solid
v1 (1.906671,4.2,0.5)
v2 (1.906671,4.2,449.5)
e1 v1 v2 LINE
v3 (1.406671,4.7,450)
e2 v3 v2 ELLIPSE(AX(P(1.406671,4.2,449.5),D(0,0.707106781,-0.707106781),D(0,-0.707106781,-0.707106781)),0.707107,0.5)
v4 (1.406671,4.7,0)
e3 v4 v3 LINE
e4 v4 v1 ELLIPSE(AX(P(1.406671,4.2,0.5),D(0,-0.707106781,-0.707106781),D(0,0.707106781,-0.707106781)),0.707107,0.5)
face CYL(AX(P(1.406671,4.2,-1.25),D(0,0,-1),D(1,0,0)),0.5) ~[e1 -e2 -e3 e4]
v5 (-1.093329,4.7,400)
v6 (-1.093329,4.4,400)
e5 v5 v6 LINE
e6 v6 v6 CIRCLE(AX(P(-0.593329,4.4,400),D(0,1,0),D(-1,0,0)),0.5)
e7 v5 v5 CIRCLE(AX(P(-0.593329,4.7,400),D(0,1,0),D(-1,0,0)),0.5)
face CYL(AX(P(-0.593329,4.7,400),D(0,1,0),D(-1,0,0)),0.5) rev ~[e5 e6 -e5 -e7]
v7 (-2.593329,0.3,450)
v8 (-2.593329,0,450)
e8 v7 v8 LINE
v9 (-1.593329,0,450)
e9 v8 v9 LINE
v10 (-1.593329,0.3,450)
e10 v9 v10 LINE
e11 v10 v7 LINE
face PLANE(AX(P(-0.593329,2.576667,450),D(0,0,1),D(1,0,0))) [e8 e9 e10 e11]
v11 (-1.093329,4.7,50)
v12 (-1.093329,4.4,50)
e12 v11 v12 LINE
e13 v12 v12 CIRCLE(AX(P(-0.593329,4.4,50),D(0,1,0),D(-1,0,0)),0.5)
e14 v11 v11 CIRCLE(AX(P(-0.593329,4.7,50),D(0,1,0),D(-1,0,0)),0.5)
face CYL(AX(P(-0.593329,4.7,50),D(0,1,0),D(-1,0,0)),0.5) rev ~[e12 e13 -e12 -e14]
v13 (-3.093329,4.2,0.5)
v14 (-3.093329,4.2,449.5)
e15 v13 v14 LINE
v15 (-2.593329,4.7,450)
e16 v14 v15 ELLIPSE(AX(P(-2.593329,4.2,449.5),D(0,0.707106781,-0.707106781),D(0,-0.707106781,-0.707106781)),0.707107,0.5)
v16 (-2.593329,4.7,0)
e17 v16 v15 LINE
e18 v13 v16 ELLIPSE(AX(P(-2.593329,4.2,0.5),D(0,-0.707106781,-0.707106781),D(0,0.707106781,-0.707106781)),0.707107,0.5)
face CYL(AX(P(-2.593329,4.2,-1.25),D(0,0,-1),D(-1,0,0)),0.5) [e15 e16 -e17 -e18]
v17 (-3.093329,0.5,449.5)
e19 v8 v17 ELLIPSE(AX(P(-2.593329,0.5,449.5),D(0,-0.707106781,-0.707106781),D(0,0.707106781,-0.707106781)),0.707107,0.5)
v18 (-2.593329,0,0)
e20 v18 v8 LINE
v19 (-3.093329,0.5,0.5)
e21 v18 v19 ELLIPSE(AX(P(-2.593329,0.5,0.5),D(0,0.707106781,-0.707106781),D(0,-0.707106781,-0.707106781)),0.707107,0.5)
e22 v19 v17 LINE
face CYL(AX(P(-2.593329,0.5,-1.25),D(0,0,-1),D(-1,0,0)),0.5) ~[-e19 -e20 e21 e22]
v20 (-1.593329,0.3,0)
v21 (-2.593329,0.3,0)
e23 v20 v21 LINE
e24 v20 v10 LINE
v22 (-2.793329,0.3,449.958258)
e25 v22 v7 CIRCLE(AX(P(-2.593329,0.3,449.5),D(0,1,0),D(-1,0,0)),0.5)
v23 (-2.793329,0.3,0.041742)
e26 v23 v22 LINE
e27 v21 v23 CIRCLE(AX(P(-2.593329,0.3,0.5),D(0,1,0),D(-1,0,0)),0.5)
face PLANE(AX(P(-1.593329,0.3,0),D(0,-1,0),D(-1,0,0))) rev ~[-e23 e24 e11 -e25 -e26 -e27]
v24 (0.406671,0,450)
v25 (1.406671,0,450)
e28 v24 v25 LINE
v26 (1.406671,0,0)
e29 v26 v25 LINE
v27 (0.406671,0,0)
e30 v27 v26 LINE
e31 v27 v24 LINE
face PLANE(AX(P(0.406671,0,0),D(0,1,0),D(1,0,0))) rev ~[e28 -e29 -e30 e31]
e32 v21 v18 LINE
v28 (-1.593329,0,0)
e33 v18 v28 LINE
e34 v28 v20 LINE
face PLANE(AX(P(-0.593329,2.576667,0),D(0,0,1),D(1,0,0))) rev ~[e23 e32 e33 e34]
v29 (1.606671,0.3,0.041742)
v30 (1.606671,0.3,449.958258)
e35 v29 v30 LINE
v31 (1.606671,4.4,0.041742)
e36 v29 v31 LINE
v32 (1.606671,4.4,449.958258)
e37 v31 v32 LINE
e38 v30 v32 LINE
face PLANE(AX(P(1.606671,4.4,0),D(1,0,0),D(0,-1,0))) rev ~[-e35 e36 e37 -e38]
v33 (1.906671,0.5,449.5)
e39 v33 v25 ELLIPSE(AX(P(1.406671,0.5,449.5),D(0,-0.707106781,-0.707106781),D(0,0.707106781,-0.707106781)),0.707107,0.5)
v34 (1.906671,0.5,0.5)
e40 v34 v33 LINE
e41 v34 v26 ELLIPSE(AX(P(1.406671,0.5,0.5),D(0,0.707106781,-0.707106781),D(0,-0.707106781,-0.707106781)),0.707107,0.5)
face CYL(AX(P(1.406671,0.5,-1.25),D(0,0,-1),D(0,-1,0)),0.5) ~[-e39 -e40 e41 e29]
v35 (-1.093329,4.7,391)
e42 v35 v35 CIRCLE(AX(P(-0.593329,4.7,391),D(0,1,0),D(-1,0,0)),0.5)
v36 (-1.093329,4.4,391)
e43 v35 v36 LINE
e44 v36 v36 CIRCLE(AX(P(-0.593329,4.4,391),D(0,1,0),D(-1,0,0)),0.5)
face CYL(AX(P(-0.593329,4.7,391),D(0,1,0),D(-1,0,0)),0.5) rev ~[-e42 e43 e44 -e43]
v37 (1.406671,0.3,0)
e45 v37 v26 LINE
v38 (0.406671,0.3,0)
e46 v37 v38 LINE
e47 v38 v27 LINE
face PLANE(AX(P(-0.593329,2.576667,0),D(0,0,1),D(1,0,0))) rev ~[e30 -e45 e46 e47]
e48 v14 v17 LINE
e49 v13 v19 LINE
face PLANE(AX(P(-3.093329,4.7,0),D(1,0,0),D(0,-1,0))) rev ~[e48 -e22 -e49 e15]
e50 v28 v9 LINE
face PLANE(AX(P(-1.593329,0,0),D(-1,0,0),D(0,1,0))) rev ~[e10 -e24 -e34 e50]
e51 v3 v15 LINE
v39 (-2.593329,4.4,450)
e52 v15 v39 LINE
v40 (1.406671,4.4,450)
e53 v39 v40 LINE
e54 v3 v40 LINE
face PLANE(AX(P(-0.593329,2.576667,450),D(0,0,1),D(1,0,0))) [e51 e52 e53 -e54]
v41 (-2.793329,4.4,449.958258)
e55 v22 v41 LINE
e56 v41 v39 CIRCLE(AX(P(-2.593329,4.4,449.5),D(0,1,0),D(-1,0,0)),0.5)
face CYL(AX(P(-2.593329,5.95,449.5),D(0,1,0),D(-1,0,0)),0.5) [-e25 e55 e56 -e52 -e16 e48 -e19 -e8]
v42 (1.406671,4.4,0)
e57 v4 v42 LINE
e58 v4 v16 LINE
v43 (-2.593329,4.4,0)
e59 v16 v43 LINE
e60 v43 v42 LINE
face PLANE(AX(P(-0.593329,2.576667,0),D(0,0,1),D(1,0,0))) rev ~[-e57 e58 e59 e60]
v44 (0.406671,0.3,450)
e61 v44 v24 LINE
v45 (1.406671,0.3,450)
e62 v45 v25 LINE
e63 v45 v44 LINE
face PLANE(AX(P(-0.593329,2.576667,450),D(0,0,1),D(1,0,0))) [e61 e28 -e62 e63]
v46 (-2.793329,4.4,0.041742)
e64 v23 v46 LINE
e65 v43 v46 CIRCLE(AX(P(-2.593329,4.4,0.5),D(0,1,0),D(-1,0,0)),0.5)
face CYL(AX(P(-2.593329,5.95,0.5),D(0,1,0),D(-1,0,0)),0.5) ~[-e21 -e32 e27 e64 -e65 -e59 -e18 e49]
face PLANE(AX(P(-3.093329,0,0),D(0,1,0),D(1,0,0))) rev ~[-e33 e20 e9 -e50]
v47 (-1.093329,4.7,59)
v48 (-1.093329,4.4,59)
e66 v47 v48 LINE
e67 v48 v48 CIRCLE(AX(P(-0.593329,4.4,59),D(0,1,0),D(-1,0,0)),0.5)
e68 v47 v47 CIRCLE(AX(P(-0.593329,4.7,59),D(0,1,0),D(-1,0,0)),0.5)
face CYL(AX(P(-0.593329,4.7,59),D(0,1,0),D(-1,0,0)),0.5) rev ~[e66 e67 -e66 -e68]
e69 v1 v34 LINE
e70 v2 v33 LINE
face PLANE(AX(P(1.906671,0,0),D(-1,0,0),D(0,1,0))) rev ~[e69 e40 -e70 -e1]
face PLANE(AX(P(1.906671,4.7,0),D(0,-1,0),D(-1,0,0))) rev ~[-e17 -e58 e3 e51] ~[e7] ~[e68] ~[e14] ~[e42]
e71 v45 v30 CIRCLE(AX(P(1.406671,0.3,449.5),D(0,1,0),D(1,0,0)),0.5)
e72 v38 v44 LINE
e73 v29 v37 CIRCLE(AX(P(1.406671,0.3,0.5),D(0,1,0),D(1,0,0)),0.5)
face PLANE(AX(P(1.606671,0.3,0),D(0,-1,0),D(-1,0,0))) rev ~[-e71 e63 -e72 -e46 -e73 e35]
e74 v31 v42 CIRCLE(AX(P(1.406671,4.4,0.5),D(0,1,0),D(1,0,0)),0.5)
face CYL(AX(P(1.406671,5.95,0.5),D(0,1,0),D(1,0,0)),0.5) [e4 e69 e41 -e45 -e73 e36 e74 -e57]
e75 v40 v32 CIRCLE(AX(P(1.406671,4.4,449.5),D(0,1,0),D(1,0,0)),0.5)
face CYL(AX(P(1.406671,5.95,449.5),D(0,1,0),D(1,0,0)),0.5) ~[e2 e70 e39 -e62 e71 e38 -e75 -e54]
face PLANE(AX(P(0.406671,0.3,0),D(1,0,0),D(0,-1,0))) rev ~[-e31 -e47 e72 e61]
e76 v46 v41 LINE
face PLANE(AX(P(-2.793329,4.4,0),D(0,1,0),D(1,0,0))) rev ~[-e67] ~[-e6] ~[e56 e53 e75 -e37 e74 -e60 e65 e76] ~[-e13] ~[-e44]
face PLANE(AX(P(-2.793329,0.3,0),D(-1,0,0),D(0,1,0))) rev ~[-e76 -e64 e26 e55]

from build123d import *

# Parameters (mm, degrees)
F1_DEPTH    = 450
F2_T1_DEPTH = 452.5
F2_T3_DEPTH = 7.2
F3_R        = 0.5
F4_DEPTH    = 25


# Not quite as in the source:
# - a fillet or chamfer that OpenCascade refuses, or shapes differently, is made with other operations: its cross-section is extruded or revolved along the edge and cut away or added


with BuildPart() as f1:
    # F0 (on Top) → F1 (new body)
    with BuildSketch(Plane.XY):
        Polygon((-3.0933290763, 0), (-1.5933290763, 0), (-1.5933290763, 0.3), (-2.7933290763, 0.3), (-2.7933290763, 4.4), (1.6066709237, 4.4), (1.6066709237, 0.3), (0.4066709237, 0.3), (0.4066709237, 0), (1.9066709237, 0), (1.9066709237, 4.7), (-3.0933290763, 4.7), align=None)
    extrude(amount=F1_DEPTH)

    # F2: fillet of radius 0.5 on 8 edges, made by hand

    # F2_s2 → F2_t1 (cut)
    with BuildSketch(Plane.XY.offset(-1.25)):
        with BuildLine():
            ThreePointArc((-3.0933290763, 4.2), (-2.9468824669, 4.5535533906), (-2.5933290763, 4.7))
            Line((-2.5933290763, 4.7), (-3.0933290763, 4.7))
            Line((-3.0933290763, 4.7), (-3.0933290763, 4.2))
        make_face()
        with BuildLine():
            ThreePointArc((-3.0933290763, 0.5), (-2.9468824669, 0.1464466094), (-2.5933290763, 0))
            Line((-2.5933290763, 0), (-3.0933290763, 0))
            Line((-3.0933290763, 0), (-3.0933290763, 0.5))
        make_face()
        with BuildLine():
            ThreePointArc((1.4066709237, 0), (1.7602243143, 0.1464466094), (1.9066709237, 0.5))
            Line((1.9066709237, 0.5), (1.9066709237, 0))
            Line((1.9066709237, 0), (1.4066709237, 0))
        make_face()
        with BuildLine():
            ThreePointArc((1.9066709237, 4.2), (1.7602243143, 4.5535533906), (1.4066709237, 4.7))
            Line((1.4066709237, 4.7), (1.9066709237, 4.7))
            Line((1.9066709237, 4.7), (1.9066709237, 4.2))
        make_face()
    extrude(amount=F2_T1_DEPTH, mode=Mode.SUBTRACT)

    # F2_s4 → F2_t3 (cut)
    with BuildSketch(Plane.XZ.offset(-5.95)):
        with BuildLine():
            ThreePointArc((-3.0933290763, 0.5), (-2.9468824669, 0.1464466094), (-2.5933290763, 0))
            Line((-2.5933290763, 0), (-3.0933290763, 0))
            Line((-3.0933290763, 0), (-3.0933290763, 0.5))
        make_face()
        with BuildLine():
            ThreePointArc((-3.0933290763, 449.5), (-2.9468824669, 449.8535533906), (-2.5933290763, 450))
            Line((-2.5933290763, 450), (-3.0933290763, 450))
            Line((-3.0933290763, 450), (-3.0933290763, 449.5))
        make_face()
        with BuildLine():
            ThreePointArc((1.9066709237, 0.5), (1.7602243143, 0.1464466094), (1.4066709237, 0))
            Line((1.4066709237, 0), (1.9066709237, 0))
            Line((1.9066709237, 0), (1.9066709237, 0.5))
        make_face()
        with BuildLine():
            ThreePointArc((1.9066709237, 449.5), (1.7602243143, 449.8535533906), (1.4066709237, 450))
            Line((1.4066709237, 450), (1.9066709237, 450))
            Line((1.9066709237, 450), (1.9066709237, 449.5))
        make_face()
    extrude(amount=F2_T3_DEPTH, mode=Mode.SUBTRACT)

    # F3 (on face) → F4 (cut)
    with BuildSketch(Plane(origin=(0, 4.7, 0), x_dir=(-1, 0, 0), z_dir=(0, 1, 0))):
        with Locations((0.5933290763, 400)):
            Circle(F3_R)
        with Locations((0.5933290763, 391)):
            Circle(F3_R)
        with Locations((0.5933290763, 50)):
            Circle(F3_R)
        with Locations((0.5933290763, 59)):
            Circle(F3_R)
    extrude(amount=-F4_DEPTH, mode=Mode.SUBTRACT)


solid = f1.part
